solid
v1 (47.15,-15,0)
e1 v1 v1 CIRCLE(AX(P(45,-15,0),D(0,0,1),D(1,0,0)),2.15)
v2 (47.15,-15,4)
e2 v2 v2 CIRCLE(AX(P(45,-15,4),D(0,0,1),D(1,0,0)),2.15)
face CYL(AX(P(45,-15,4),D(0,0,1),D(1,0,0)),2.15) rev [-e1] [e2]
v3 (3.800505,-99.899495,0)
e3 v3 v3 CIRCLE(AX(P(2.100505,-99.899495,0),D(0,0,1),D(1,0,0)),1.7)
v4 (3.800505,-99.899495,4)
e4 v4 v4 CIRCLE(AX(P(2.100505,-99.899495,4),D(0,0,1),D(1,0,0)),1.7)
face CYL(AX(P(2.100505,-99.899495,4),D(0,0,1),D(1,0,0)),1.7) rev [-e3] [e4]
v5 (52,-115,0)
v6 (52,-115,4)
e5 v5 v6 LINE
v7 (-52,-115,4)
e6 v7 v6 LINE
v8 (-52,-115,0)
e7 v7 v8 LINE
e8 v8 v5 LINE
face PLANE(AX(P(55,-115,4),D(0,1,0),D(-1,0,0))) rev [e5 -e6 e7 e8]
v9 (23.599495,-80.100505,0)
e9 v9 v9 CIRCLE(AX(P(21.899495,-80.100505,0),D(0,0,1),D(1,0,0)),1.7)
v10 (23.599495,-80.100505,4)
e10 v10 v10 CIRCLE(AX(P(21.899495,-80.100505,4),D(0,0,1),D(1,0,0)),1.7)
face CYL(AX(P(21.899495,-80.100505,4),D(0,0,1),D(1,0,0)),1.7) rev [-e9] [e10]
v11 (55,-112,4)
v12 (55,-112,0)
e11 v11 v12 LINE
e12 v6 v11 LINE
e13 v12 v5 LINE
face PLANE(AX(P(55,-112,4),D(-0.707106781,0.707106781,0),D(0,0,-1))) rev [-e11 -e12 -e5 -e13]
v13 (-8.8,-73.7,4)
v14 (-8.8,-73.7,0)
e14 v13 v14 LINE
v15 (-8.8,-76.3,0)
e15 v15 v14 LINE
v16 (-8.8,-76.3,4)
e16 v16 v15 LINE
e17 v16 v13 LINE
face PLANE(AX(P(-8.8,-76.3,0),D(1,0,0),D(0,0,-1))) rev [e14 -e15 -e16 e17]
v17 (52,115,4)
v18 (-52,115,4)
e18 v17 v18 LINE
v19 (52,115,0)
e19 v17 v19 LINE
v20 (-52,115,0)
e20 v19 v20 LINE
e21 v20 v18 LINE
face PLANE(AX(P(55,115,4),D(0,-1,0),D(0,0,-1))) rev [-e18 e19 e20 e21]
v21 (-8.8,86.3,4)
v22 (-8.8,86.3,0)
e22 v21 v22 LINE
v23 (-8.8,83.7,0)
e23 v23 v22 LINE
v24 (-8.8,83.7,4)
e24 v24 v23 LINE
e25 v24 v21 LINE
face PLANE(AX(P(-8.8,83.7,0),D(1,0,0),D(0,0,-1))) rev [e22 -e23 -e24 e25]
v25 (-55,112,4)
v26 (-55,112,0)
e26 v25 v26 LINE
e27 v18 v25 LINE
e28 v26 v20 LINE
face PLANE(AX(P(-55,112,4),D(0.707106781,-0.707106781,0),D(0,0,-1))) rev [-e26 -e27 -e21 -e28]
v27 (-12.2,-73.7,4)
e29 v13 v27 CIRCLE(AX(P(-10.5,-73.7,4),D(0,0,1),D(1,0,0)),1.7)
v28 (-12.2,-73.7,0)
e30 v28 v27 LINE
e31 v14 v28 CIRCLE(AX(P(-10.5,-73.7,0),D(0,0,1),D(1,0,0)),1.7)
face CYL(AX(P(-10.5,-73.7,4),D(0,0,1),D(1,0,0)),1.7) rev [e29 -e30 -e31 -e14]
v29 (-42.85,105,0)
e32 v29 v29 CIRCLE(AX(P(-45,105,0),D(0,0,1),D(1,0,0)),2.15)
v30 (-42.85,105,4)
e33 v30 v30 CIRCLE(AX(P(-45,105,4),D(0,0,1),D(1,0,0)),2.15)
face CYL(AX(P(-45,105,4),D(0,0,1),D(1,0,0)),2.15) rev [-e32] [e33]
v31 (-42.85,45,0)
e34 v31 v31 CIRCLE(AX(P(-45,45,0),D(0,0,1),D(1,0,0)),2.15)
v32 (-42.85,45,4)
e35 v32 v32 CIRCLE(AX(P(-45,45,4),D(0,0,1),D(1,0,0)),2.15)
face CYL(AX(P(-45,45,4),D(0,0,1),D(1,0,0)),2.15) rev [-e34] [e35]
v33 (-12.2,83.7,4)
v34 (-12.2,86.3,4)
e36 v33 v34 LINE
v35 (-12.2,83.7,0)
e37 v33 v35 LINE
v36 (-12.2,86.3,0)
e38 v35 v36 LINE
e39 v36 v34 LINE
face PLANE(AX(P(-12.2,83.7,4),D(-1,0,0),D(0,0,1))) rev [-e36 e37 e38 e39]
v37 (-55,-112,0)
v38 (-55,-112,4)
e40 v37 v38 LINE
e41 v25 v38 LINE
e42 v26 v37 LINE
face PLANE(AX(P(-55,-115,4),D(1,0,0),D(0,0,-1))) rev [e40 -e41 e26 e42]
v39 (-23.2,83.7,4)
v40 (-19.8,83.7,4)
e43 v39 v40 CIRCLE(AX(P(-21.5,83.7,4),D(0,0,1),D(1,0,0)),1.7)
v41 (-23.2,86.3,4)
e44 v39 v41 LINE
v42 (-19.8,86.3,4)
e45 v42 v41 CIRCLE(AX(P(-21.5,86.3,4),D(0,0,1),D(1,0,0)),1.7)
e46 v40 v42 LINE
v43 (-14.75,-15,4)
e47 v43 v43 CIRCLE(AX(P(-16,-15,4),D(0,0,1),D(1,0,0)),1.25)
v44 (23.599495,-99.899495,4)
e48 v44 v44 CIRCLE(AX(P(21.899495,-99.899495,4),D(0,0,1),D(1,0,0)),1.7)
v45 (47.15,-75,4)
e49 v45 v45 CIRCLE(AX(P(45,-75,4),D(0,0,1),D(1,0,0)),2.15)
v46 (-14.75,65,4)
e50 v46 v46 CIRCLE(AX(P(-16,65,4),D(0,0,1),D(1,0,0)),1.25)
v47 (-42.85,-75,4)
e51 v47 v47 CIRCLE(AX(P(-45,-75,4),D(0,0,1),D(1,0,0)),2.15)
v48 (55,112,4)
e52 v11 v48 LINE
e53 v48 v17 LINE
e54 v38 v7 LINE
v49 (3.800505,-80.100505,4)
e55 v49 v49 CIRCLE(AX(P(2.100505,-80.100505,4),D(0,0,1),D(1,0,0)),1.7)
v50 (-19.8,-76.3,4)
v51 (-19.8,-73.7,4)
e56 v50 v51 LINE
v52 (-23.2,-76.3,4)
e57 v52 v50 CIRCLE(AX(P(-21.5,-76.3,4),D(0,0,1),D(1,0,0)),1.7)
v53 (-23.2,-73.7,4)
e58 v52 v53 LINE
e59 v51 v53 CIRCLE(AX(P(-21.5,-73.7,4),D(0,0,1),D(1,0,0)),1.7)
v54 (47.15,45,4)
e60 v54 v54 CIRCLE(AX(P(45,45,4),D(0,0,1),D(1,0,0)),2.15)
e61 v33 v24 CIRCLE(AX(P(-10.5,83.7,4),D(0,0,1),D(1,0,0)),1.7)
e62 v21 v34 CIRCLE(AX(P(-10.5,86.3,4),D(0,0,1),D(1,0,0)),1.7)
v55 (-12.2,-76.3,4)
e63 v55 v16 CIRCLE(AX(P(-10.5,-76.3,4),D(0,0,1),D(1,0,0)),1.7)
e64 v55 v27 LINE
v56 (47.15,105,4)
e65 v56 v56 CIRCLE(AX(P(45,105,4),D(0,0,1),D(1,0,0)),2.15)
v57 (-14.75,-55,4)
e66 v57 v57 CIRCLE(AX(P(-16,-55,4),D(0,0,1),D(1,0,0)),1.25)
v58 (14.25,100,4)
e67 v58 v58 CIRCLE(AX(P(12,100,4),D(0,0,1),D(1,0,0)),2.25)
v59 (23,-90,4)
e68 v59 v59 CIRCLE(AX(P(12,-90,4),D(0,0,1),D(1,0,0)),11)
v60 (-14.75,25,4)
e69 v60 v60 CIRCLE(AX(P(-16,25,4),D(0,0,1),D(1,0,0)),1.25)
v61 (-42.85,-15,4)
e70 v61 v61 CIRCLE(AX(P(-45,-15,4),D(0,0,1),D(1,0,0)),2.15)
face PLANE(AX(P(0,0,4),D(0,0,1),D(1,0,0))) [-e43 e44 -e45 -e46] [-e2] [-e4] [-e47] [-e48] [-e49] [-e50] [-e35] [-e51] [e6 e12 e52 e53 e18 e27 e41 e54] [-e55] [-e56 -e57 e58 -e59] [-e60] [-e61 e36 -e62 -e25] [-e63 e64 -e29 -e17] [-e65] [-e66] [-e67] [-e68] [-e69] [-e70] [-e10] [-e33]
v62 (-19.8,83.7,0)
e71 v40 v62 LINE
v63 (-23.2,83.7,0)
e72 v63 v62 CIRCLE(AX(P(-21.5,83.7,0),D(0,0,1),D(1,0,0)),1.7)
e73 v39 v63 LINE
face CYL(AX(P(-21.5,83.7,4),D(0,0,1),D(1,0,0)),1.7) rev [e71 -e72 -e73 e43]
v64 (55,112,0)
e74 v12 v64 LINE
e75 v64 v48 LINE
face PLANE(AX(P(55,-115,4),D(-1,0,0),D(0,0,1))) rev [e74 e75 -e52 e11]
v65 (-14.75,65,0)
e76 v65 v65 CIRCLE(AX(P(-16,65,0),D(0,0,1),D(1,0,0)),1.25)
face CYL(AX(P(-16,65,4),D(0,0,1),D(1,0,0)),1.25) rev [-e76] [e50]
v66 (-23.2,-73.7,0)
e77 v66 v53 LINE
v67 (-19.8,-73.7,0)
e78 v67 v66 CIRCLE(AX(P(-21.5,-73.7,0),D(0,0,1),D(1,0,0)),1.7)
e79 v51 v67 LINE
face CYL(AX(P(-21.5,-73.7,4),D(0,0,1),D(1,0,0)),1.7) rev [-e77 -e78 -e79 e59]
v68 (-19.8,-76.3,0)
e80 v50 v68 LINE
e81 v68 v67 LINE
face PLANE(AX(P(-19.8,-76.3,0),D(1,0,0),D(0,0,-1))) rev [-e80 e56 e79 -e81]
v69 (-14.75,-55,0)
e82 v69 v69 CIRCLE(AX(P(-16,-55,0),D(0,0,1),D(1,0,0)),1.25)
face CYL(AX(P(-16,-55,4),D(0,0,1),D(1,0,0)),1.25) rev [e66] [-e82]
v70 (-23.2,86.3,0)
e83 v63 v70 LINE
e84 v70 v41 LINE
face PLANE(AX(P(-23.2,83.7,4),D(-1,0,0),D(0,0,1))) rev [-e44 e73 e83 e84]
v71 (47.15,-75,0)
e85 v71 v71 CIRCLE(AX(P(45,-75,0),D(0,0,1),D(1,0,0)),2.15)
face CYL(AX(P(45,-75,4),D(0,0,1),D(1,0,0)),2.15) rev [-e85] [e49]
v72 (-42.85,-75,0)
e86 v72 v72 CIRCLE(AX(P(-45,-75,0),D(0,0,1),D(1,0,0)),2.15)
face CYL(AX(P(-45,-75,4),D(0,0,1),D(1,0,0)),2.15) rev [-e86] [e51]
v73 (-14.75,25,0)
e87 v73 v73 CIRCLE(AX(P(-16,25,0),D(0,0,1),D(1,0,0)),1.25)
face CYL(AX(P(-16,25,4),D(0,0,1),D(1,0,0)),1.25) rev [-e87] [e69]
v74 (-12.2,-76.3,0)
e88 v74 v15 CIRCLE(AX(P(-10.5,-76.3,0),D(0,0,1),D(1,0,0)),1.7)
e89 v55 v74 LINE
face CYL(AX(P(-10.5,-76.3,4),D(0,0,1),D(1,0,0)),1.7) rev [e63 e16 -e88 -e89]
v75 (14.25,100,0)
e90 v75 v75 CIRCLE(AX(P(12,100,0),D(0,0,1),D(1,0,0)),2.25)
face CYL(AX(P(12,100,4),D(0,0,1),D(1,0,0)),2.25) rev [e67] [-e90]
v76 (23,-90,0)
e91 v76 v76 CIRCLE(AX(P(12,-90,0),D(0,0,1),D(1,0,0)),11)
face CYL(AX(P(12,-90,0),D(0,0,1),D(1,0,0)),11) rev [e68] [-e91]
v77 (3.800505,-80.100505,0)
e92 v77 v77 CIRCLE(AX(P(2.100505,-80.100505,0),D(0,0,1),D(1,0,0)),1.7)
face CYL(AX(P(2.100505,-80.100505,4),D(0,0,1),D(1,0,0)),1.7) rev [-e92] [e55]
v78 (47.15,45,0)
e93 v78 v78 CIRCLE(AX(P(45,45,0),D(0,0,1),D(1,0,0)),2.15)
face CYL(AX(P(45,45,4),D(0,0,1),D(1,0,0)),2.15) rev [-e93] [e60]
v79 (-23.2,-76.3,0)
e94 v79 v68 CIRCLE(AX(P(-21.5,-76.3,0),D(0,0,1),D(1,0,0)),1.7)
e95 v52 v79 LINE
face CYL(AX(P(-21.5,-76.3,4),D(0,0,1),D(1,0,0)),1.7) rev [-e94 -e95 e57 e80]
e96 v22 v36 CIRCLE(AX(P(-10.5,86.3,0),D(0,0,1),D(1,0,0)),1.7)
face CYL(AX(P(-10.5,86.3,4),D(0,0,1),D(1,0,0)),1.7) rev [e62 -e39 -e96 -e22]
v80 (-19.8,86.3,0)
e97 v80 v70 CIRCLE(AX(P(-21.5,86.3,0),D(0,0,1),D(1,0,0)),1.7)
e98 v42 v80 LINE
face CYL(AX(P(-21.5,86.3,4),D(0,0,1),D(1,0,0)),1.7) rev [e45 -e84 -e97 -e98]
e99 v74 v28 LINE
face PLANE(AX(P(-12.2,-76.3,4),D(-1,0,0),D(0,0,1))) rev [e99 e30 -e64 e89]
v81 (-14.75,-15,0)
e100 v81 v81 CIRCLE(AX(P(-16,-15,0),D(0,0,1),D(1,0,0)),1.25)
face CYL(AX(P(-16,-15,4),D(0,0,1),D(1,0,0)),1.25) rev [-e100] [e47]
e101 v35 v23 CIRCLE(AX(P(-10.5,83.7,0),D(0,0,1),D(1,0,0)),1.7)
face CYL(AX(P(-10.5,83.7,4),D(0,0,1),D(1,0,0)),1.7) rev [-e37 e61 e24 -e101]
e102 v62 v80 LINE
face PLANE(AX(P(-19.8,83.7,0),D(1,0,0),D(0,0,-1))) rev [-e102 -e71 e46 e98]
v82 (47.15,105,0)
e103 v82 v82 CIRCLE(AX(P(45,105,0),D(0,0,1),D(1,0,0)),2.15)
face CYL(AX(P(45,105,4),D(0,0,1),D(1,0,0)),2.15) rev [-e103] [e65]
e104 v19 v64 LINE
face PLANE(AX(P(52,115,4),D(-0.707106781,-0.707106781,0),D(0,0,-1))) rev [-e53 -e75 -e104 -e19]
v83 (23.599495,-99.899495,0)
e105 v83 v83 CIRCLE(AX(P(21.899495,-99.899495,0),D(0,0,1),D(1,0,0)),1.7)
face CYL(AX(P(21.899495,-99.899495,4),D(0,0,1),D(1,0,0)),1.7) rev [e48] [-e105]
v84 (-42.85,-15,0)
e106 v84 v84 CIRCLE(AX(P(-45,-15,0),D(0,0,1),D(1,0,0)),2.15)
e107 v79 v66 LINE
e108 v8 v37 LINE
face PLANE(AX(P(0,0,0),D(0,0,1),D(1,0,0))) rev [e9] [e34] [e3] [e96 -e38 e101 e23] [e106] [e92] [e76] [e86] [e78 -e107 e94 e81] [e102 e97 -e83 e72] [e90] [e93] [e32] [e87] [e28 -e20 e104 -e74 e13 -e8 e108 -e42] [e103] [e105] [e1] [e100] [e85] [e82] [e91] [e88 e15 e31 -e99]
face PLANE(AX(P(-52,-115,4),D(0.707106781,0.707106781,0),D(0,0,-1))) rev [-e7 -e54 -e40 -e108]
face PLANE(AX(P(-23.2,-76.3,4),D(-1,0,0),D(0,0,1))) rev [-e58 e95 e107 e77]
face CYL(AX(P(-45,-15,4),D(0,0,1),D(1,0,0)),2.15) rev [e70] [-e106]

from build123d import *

# Parameters (mm, degrees)
SKIZZE1_W                       = 110
SKIZZE1_H                       = 230
AUFSATZ_LINEAR_AUSTRAGEN1_DEPTH = 4
M3_GEWINDEBOHRUNG1_D            = 2.5
DURCHGANGSLOCH_F_R_M41_D        = 4.3
DURCHGANGSLOCH_F_R_M33_DEPTH    = 4
DURCHGANGSLOCH_F_R_M32_D        = 3.4
SKIZZE10_R                      = 11
SCHNITT_LINEAR_AUSTRAGEN1_DEPTH = 128.538229563
DURCHGANGSLOCH_F_R_M42_D        = 4.5
FASE1_SIZE                      = 3


# Read off the part's stored shape, not the designer's step: Durchgangsloch für M33
with BuildPart() as part:
    # Skizze1 → Aufsatz-Linear austragen1 (new body)
    with BuildSketch(Plane.XY):
        Rectangle(SKIZZE1_W, SKIZZE1_H)
    extrude(amount=AUFSATZ_LINEAR_AUSTRAGEN1_DEPTH)

    # M3 Gewindebohrung1 (through all)
    with Locations(Plane.XY.offset(4)):
        with Locations((-16, 65), (-16, 25), (-16, -15), (-16, -55)):
            Hole(M3_GEWINDEBOHRUNG1_D / 2)

    # Durchgangsloch für M41 (through all)
    with Locations(Plane.XY.offset(4)):
        with Locations((-45, 105), (45, 105), (-45, 45), (-45, -15), (45, 45), (45, -15), (45, -75), (-45, -75)):
            Hole(DURCHGANGSLOCH_F_R_M41_D / 2)

    # Durchgangsloch für M33 outline → Durchgangsloch für M33 (cut)
    with BuildSketch(Plane.XY):
        with BuildLine():
            Line((-8.8, 83.7), (-8.8, 86.3))
            ThreePointArc((-8.8, 86.3), (-10.5, 88), (-12.2, 86.3))
            Line((-12.2, 86.3), (-12.2, 83.7))
            ThreePointArc((-12.2, 83.7), (-10.5, 82), (-8.8, 83.7))
        make_face()
        with BuildLine():
            ThreePointArc((-8.8, -73.7), (-10.5, -72), (-12.2, -73.7))
            Line((-12.2, -73.7), (-12.2, -76.3))
            ThreePointArc((-12.2, -76.3), (-10.5, -78), (-8.8, -76.3))
            Line((-8.8, -76.3), (-8.8, -73.7))
        make_face()
        with BuildLine():
            Line((-19.8, 83.7), (-19.8, 86.3))
            ThreePointArc((-19.8, 86.3), (-21.5, 88), (-23.2, 86.3))
            Line((-23.2, 86.3), (-23.2, 83.7))
            ThreePointArc((-23.2, 83.7), (-21.5, 82), (-19.8, 83.7))
        make_face()
        with BuildLine():
            ThreePointArc((-19.8, -73.7), (-21.5, -72), (-23.2, -73.7))
            Line((-23.2, -73.7), (-23.2, -76.3))
            ThreePointArc((-23.2, -76.3), (-21.5, -78), (-19.8, -76.3))
            Line((-19.8, -76.3), (-19.8, -73.7))
        make_face()
    extrude(amount=DURCHGANGSLOCH_F_R_M33_DEPTH, mode=Mode.SUBTRACT)

    # Durchgangsloch für M32 (through all)
    with Locations(Plane.XY.offset(4)):
        with Locations((21.899494937, -80.100505063), (2.100505063, -80.100505063), (21.899494937, -99.899494937), (2.100505063, -99.899494937)):
            Hole(DURCHGANGSLOCH_F_R_M32_D / 2)

    # Skizze10 → Schnitt-Linear austragen1 (cut, through all)
    with BuildSketch(Plane.XY.offset(4)):
        with Locations((12, -90)):
            Circle(SKIZZE10_R)
    extrude(amount=-SCHNITT_LINEAR_AUSTRAGEN1_DEPTH, mode=Mode.SUBTRACT)

    # Durchgangsloch für M42 (through all)
    with Locations(Plane.XY.offset(4)):
        with Locations((12, 100)):
            Hole(DURCHGANGSLOCH_F_R_M42_D / 2)

    # Fase1
    fase1_edges = [part.edges().sort_by_distance(p)[0] for p in [
        (-55, 115, 2),
        (55, 115, 2),
        (55, -115, 2),
        (-55, -115, 2),
    ]]
    chamfer(fase1_edges, length=FASE1_SIZE)


solid = part.part
